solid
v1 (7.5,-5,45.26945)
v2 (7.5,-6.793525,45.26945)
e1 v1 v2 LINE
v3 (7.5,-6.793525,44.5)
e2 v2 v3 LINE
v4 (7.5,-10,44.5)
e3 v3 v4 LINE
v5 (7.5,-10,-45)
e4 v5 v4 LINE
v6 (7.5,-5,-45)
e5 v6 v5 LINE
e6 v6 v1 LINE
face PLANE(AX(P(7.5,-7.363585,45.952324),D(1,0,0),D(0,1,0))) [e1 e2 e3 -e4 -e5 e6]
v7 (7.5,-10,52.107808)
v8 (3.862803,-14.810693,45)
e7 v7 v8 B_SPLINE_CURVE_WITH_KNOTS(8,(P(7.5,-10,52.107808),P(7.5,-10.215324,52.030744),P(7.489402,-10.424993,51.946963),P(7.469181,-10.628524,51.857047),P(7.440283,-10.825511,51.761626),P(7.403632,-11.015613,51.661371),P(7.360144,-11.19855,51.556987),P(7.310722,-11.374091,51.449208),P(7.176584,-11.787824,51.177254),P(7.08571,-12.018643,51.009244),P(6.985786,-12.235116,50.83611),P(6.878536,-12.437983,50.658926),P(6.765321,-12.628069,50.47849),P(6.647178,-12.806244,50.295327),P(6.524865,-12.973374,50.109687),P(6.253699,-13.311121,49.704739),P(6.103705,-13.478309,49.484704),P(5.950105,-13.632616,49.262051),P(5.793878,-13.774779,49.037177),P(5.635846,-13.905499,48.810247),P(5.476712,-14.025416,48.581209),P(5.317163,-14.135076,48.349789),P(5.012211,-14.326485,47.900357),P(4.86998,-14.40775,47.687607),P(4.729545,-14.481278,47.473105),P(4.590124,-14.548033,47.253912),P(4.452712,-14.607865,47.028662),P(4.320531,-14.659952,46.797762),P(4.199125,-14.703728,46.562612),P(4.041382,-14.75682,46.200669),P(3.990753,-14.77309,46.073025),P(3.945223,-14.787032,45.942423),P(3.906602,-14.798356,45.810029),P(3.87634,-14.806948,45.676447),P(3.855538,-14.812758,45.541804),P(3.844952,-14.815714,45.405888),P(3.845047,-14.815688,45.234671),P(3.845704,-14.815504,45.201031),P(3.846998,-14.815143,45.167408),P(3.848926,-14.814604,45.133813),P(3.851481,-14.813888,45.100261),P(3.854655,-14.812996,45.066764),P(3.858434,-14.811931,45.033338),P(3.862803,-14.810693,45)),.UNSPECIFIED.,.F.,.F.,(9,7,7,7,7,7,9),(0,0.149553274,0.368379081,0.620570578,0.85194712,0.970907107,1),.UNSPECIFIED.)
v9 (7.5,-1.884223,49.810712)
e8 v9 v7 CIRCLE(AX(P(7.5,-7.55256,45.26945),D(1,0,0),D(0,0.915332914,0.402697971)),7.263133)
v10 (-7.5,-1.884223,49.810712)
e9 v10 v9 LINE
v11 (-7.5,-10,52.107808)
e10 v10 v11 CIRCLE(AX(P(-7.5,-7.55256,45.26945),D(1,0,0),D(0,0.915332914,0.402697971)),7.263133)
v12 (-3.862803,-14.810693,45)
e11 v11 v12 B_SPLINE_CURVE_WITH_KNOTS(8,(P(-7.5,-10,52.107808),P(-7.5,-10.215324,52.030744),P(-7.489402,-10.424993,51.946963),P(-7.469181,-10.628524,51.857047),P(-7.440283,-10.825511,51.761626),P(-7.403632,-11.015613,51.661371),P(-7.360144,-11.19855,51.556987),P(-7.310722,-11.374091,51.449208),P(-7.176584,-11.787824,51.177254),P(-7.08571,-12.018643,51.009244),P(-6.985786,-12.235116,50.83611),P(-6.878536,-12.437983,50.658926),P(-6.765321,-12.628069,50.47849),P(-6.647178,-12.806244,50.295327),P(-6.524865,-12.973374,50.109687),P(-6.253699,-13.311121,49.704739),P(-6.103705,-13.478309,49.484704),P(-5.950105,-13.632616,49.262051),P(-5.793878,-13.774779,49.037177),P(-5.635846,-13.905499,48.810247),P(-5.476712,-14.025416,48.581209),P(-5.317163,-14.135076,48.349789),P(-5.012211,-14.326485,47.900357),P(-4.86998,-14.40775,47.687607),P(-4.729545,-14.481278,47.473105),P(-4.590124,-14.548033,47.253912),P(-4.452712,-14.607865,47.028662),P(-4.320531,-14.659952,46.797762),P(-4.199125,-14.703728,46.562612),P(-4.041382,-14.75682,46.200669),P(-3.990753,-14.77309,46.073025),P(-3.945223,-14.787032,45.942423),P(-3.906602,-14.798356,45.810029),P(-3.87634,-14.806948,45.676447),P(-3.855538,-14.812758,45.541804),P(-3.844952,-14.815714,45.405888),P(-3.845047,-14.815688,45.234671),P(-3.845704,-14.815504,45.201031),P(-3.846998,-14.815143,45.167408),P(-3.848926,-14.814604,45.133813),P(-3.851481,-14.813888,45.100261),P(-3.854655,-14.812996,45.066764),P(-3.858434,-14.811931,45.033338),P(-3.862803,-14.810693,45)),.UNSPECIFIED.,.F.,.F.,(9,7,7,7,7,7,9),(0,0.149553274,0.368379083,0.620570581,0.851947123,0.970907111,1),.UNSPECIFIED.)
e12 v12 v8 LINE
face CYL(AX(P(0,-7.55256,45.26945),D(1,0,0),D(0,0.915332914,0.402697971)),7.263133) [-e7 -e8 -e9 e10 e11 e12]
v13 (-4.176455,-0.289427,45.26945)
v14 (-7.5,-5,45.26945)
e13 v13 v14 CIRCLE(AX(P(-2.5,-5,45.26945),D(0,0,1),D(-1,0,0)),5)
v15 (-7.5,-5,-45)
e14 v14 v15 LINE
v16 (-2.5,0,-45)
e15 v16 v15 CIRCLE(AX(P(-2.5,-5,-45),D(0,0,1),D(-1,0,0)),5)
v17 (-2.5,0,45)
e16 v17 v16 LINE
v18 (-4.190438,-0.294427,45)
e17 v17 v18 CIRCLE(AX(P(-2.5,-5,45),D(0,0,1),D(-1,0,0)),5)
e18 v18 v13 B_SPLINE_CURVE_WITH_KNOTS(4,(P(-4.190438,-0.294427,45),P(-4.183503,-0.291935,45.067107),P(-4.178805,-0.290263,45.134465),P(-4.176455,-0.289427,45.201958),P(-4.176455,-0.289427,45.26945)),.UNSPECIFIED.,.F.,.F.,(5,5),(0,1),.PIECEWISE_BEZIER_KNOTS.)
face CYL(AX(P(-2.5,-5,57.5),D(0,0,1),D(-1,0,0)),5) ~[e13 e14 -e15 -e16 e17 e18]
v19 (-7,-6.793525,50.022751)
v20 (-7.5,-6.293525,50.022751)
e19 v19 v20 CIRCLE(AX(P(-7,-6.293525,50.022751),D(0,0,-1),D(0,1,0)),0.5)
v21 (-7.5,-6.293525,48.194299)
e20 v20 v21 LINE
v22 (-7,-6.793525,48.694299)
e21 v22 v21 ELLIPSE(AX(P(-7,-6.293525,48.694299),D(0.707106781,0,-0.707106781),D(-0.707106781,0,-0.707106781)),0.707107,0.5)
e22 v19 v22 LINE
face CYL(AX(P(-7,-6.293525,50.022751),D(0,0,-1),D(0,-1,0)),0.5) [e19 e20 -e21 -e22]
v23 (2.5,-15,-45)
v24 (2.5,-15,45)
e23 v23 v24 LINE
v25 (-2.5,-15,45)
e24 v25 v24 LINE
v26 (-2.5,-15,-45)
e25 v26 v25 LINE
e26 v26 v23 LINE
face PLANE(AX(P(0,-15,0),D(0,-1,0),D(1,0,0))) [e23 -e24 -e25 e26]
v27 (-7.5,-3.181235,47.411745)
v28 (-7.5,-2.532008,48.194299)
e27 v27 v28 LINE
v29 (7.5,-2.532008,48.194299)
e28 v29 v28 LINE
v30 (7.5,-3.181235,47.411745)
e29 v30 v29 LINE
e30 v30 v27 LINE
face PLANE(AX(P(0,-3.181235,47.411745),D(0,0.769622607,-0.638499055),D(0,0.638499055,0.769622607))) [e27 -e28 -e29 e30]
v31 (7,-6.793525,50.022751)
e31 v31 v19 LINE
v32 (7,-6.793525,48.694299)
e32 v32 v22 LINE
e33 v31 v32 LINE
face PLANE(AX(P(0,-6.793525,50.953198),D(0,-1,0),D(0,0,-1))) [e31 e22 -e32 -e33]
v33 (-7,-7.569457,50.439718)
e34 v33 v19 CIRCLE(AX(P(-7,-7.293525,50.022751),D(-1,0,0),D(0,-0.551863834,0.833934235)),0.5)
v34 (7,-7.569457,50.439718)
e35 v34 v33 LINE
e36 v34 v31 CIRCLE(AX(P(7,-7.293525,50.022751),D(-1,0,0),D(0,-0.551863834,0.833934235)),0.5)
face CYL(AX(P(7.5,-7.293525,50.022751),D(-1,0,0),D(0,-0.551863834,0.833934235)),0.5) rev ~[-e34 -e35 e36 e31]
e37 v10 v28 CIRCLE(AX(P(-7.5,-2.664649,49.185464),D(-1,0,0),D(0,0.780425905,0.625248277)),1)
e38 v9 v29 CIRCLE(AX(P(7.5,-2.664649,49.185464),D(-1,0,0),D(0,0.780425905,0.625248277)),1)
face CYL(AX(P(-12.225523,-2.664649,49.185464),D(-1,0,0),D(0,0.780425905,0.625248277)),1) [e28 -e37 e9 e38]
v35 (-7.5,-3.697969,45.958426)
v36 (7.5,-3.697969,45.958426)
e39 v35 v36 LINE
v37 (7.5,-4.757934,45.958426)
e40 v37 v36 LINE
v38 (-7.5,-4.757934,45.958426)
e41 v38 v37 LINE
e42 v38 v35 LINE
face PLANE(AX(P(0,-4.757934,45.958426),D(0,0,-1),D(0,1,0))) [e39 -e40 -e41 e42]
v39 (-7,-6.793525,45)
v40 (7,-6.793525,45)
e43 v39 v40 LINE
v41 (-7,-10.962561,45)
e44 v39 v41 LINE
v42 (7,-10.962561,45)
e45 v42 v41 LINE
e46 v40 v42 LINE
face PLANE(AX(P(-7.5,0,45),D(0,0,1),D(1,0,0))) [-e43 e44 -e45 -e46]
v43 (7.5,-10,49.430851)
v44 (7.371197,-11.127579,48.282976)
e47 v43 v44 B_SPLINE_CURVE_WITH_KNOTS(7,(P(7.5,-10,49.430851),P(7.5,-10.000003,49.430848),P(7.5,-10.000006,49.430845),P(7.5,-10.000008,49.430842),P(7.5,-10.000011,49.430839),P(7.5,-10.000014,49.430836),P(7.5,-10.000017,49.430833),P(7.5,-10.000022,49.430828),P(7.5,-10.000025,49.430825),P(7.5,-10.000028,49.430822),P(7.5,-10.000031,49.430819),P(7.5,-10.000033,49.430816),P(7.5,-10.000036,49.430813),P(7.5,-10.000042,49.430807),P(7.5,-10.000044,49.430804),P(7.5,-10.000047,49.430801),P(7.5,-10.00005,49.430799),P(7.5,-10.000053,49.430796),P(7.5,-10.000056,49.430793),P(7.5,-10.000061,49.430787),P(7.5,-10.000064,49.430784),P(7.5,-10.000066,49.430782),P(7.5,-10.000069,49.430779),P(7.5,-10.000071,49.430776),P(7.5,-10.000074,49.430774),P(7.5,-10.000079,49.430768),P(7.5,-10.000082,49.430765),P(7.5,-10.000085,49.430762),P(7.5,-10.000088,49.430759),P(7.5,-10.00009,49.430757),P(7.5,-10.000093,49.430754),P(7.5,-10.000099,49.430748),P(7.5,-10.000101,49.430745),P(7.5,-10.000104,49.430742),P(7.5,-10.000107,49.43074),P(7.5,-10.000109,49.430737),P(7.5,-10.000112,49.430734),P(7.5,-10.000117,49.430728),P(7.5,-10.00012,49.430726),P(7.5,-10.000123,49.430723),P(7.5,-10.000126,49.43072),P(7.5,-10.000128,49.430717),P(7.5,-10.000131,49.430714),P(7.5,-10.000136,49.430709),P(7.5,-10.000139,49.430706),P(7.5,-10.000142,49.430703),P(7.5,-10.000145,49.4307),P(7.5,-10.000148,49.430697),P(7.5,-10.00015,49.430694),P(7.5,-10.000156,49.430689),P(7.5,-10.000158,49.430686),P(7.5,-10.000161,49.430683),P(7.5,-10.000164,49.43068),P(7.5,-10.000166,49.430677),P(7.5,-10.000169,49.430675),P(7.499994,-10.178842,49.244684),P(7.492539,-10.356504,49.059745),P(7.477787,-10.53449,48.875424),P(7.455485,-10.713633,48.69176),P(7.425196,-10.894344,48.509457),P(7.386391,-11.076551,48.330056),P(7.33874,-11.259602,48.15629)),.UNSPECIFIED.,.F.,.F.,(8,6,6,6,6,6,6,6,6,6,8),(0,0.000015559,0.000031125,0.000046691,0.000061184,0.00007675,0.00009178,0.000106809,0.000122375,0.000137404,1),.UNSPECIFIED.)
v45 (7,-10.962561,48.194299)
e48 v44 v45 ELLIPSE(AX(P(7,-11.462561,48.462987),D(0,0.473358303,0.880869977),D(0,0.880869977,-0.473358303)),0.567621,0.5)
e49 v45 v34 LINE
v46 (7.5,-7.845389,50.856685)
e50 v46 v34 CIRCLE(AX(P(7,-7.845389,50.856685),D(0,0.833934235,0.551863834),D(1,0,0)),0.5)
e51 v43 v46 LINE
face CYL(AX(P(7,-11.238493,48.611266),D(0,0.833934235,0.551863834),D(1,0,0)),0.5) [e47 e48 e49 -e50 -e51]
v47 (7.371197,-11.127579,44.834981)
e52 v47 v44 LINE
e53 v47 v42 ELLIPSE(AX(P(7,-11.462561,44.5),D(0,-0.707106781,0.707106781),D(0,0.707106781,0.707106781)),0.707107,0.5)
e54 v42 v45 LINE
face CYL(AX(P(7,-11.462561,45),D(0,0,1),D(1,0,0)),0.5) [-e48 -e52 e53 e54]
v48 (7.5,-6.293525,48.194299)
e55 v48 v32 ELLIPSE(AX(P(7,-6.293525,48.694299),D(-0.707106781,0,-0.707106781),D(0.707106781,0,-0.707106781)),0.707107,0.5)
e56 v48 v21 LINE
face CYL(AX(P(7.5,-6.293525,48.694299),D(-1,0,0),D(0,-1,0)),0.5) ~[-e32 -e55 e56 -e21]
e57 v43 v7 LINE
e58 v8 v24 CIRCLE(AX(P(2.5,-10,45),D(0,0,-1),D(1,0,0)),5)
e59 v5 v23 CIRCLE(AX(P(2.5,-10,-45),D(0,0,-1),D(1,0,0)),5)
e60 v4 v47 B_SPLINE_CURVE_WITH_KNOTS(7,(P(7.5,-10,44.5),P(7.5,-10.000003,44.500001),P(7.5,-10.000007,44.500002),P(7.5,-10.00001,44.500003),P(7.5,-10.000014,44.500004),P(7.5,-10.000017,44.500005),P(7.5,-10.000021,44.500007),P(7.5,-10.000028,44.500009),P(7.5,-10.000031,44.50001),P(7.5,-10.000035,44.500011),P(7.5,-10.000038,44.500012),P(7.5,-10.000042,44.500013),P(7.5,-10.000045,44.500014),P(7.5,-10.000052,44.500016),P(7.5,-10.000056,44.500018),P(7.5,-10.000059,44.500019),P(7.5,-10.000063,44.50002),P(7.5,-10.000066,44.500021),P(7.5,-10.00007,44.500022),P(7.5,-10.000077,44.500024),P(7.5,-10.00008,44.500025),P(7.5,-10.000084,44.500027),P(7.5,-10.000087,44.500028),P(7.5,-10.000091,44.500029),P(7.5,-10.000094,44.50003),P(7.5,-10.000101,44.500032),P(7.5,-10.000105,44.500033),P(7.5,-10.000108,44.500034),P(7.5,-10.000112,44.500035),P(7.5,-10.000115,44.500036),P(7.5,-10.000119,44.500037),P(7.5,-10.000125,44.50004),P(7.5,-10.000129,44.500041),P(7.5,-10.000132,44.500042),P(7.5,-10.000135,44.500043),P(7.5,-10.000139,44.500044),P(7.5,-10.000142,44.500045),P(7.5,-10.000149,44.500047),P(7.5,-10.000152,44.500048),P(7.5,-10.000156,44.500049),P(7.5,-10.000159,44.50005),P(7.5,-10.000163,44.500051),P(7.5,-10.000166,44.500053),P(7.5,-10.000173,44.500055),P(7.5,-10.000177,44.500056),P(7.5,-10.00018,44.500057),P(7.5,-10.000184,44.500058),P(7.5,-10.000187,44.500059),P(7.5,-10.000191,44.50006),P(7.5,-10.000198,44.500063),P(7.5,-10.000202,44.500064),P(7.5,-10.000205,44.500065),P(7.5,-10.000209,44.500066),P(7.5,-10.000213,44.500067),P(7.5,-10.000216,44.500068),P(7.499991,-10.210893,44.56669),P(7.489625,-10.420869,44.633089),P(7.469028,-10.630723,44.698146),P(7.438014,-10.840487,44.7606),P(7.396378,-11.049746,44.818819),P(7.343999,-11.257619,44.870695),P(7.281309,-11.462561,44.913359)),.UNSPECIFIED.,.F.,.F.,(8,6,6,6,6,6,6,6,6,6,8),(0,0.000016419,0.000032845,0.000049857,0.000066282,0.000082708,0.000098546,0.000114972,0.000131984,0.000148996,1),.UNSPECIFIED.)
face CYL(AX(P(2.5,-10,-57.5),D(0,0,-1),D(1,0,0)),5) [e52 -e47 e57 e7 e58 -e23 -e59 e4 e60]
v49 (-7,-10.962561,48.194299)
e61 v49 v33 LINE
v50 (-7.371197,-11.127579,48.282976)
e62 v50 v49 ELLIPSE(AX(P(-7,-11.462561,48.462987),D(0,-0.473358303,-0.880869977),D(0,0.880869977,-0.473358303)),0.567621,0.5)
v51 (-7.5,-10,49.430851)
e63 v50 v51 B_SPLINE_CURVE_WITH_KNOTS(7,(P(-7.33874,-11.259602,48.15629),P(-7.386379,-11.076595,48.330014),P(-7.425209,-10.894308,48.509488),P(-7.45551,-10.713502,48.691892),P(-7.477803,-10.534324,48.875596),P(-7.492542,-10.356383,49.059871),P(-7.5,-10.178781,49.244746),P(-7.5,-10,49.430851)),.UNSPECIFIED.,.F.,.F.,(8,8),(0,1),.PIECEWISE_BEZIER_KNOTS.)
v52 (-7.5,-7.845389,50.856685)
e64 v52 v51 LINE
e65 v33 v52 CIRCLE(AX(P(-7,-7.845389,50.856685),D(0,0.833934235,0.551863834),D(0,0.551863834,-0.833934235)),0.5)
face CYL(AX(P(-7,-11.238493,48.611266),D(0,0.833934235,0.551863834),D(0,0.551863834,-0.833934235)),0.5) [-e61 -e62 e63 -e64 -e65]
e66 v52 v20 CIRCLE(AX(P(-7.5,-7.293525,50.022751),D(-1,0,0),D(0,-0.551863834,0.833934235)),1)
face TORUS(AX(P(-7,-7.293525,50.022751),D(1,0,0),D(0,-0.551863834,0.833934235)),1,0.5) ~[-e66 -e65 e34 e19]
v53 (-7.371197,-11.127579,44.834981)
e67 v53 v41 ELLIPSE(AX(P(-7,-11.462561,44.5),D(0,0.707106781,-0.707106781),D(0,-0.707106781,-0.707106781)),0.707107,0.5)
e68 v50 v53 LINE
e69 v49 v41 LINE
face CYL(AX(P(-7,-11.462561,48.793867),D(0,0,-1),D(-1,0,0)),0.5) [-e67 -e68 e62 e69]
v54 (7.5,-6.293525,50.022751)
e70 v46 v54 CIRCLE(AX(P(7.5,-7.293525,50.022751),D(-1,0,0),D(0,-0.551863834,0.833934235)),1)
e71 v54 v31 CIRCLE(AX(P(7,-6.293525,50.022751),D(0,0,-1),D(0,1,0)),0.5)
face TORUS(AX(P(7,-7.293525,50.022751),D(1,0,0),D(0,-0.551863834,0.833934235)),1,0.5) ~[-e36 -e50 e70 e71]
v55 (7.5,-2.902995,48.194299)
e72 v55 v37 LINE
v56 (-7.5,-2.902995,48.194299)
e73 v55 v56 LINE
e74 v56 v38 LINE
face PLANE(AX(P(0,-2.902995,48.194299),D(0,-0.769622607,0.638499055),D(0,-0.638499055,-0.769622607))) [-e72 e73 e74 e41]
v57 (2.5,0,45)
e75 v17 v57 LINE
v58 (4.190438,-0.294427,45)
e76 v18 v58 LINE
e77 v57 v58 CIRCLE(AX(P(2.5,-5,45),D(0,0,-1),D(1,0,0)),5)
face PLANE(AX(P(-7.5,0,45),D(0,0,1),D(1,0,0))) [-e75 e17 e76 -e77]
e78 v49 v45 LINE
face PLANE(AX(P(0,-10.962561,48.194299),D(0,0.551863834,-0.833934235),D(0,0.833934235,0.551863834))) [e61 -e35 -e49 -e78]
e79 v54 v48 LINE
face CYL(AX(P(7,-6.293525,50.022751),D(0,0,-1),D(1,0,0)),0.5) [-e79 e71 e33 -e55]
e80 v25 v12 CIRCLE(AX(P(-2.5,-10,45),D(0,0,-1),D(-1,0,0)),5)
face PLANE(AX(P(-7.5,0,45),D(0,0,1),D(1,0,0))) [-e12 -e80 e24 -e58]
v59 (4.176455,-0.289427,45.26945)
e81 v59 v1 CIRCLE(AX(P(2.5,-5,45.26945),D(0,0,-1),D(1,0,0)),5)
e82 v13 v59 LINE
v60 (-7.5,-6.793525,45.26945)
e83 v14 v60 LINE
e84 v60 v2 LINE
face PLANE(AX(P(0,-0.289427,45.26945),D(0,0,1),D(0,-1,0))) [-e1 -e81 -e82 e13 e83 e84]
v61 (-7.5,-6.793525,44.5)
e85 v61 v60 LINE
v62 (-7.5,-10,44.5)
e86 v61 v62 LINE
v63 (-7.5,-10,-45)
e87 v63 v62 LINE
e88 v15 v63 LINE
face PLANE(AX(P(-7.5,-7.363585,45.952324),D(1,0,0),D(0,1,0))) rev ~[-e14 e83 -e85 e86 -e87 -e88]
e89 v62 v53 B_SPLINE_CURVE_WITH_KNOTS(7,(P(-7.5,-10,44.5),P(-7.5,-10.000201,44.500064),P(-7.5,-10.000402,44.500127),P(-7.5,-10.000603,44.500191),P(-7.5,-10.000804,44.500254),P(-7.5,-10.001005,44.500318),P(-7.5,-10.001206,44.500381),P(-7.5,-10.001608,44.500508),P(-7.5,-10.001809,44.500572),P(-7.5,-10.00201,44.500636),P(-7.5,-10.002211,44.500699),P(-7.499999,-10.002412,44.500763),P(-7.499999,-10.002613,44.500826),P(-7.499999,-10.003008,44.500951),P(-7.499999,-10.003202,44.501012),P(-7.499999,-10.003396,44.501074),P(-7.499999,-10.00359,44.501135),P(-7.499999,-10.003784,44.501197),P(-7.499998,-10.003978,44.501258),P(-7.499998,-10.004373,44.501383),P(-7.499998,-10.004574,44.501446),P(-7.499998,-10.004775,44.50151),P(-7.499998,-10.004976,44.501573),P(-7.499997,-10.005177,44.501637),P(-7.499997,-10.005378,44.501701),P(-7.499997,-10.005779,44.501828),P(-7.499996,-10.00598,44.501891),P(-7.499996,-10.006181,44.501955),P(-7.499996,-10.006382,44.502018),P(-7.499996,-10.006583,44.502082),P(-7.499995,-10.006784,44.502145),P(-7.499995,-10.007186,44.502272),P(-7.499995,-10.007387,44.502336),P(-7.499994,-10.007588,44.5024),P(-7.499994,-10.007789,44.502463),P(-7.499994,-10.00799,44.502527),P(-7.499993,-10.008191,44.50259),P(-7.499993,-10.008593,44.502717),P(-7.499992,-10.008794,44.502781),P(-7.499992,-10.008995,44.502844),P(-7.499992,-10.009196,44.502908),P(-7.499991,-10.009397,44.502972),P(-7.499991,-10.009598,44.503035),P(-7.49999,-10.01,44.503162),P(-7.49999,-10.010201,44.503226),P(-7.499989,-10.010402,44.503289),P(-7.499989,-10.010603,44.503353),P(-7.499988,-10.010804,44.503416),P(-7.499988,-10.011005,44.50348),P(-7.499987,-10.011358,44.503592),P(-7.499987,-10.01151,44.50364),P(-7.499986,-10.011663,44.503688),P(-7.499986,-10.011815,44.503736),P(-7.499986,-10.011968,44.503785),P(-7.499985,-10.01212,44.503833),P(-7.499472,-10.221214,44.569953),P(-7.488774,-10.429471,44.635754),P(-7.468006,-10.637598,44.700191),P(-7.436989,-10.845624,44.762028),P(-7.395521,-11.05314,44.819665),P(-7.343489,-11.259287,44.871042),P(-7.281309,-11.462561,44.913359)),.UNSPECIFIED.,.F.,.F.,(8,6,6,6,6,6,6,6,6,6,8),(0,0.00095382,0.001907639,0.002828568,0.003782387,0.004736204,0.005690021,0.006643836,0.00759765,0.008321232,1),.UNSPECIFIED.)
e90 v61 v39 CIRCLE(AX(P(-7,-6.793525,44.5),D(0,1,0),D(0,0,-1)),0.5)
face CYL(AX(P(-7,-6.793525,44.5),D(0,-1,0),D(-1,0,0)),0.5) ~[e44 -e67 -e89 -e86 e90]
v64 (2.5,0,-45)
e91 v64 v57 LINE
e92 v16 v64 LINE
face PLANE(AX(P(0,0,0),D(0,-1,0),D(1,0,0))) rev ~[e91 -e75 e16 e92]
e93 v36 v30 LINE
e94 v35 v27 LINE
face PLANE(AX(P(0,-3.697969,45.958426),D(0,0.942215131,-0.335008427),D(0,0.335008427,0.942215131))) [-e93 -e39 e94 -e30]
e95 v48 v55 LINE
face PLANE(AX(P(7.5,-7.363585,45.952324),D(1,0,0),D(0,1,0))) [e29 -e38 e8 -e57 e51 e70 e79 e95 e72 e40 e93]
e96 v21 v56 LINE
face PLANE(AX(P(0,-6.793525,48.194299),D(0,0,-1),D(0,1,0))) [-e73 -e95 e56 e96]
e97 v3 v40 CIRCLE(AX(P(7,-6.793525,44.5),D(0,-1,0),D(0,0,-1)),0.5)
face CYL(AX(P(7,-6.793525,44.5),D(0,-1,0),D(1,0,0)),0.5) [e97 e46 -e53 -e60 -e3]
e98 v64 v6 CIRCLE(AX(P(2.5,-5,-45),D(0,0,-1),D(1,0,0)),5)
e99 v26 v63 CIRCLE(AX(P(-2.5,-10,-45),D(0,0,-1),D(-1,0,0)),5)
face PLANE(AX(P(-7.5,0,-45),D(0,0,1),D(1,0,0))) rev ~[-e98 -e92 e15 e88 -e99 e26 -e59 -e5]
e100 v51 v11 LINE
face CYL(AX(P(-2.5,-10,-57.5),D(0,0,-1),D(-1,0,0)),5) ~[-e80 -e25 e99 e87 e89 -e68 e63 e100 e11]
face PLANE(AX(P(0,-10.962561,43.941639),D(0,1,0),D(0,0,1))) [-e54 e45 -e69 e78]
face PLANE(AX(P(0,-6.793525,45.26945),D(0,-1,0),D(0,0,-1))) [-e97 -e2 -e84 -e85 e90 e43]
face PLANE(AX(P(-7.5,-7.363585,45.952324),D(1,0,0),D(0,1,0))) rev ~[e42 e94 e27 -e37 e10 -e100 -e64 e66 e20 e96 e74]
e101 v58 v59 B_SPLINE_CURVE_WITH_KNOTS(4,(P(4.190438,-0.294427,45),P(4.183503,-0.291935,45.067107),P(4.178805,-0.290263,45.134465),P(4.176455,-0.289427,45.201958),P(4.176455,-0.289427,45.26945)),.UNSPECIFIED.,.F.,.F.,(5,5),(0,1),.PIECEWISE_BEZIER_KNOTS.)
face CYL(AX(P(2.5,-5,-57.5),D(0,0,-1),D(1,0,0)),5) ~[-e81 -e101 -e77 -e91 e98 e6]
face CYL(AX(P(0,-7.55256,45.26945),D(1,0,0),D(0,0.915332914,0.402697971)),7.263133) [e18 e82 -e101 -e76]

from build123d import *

# Parameters (mm, degrees)
F0_W         = 15
F0_H         = 90
F1_DEPTH     = 15
F3_DEPTH     = 7.5
F4_DEPTH     = 7.5
F5_F1_R      = 0.5
F5_F2_R      = 0.5
F6_R         = 0.5
F7_T1_DEPTH  = 24.4510456068
F8_T1_DEPTH  = 115
F8_T6_DEPTH  = 115
F8_T11_DEPTH = 115


# Not quite as in the source:
# - a fillet or chamfer that OpenCascade refuses, or shapes differently, is made with other operations: its cross-section is extruded or revolved along the edge and cut away or added


with BuildPart() as f1:
    # F0 (on Front) → F1 (new body)
    with BuildSketch(Plane.XZ):
        Rectangle(F0_W, F0_H)
    extrude(amount=F1_DEPTH)

    # F2 (on Right) → F3 (join, symmetric)
    with BuildSketch(Plane.YZ):
        with BuildLine():
            Line((-2.532008104, 48.1942993341), (-0.9043752619, 48.1942993341))
            ThreePointArc((-0.9043752619, 48.1942993341), (-14.6602935003, 43.7750522985), (-0.289426955, 45.269450398))
            Line((-0.289426955, 45.269450398), (-6.7935246953, 45.269450398))
            Line((-6.7935246953, 45.269450398), (-6.7935246953, 43.9416393638))
            Line((-6.7935246953, 43.9416393638), (-10.9625607729, 43.9416393638))
            Line((-10.9625607729, 43.9416393638), (-10.9625607729, 48.1942993341))
            Line((-10.9625607729, 48.1942993341), (-6.7935246953, 50.9531982243))
            Line((-6.7935246953, 50.9531982243), (-6.7935246953, 48.1942993341))
            Line((-6.7935246953, 48.1942993341), (-2.9029950965, 48.1942993341))
            Line((-2.9029950965, 48.1942993341), (-2.532008104, 48.1942993341))
        make_face()
    extrude(amount=F3_DEPTH, both=True)

    # F2 (on Right) → F4 (join, symmetric)
    with BuildSketch(Plane.YZ):
        Polygon((-3.1812353409, 47.4117453826), (-2.9029950965, 48.1942993341), (-4.7579342499, 45.9584258497), (-3.6979690194, 45.9584258497), align=None)
        Polygon((-3.1812353409, 47.4117453826), (-2.532008104, 48.1942993341), (-2.9029950965, 48.1942993341), align=None)
    extrude(amount=F4_DEPTH, both=True)

    # F5: fillet of radius 0.5 on 7 edges, made by hand

    # F5_f1
    f5_f1_edges = [f1.edges().sort_by_distance(p)[0] for p in [
        (0, -6.7935246953, 50.9531982243),
    ]]
    fillet(f5_f1_edges, radius=F5_F1_R)

    # F5_f2
    f5_f2_edges = [f1.edges().sort_by_distance(p)[0] for p in [
        (7.5, -9.2660086927, 49.3170086521),
        (7.5, -10.9625607729, 46.597149667),
        (7.5, -8.8780427341, 45),
        (-7.5, -6.7935246953, 49.1085250933),
        (0, -6.7935246953, 48.1942993341),
        (7.5, -6.7935246953, 49.1085250933),
        (7.5, -7.0568455439, 50.4631858413),
        (-7.5, -7.0568455439, 50.4631858413),
    ]]
    fillet(f5_f2_edges, radius=F5_F2_R)

    # F6
    f6_edges = [f1.edges().sort_by_distance(p)[0] for p in [
        (-7.5, -8.878043, 45),
        (-7.5, -10.962561, 46.59715),
    ]]
    fillet(f6_edges, radius=F6_R)

    # F7: fillet of radius 1 on 1 edges, made by hand

    # F7_s2 → F7_t1 (cut)
    with BuildSketch(Plane.YZ.offset(-12.2255228034)):
        with BuildLine():
            ThreePointArc((-1.8842228199, 49.8107118079), (-1.7364138721, 48.8134688286), (-2.532008104, 48.1942993341))
            Line((-2.532008104, 48.1942993341), (-0.9043752619, 48.1942993341))
            ThreePointArc((-0.9043752619, 48.1942993341), (-1.3414912221, 49.0345169623), (-1.8842228199, 49.8107118079))
        make_face()
    extrude(amount=F7_T1_DEPTH, mode=Mode.SUBTRACT)

    # F8: fillet of radius 5 on 4 edges, made by hand

    # F8_s2 → F8_t1 (cut)
    with BuildSketch(Plane.XY.offset(-57.5)):
        with BuildLine():
            ThreePointArc((-7.5, -10), (-6.0355339059, -13.5355339059), (-2.5, -15))
            Line((-2.5, -15), (-7.5, -15))
            Line((-7.5, -15), (-7.5, -10))
        make_face()
        with BuildLine():
            ThreePointArc((7.5, -10), (6.0355339059, -13.5355339059), (2.5, -15))
            Line((2.5, -15), (7.5, -15))
            Line((7.5, -15), (7.5, -10))
        make_face()
    extrude(amount=F8_T1_DEPTH, mode=Mode.SUBTRACT)


with BuildPart() as f8_tool4:
    # F8_s5 → F8_t6 (new body)
    with BuildSketch(Plane.XY.offset(57.5)):
        with BuildLine():
            ThreePointArc((-7.5, -5), (-6.0355339059, -1.4644660941), (-2.5, 0))
            Line((-2.5, 0), (-7.5, 0))
            Line((-7.5, 0), (-7.5, -5))
        make_face()
    extrude(amount=-F8_T6_DEPTH)

    split(bisect_by=Plane.XY.offset(45.269450398), keep=Keep.BOTTOM)


with BuildPart() as f1_1:
    add(f1.part)

    # F8_t3: cut F8_tool4
    add(f8_tool4.part, mode=Mode.SUBTRACT)


with BuildPart() as f8_tool9:
    # F8_s10 → F8_t11 (new body)
    with BuildSketch(Plane.XY.offset(-57.5)):
        with BuildLine():
            ThreePointArc((7.5, -5), (6.0355339059, -1.4644660941), (2.5, 0))
            Line((2.5, 0), (7.5, 0))
            Line((7.5, 0), (7.5, -5))
        make_face()
    extrude(amount=F8_T11_DEPTH)

    split(bisect_by=Plane.XY.offset(45.269450398), keep=Keep.BOTTOM)


with BuildPart() as f1_2:
    add(f1_1.part)

    # F8_t8: cut F8_tool9
    add(f8_tool9.part, mode=Mode.SUBTRACT)


solid = f1_2.part
